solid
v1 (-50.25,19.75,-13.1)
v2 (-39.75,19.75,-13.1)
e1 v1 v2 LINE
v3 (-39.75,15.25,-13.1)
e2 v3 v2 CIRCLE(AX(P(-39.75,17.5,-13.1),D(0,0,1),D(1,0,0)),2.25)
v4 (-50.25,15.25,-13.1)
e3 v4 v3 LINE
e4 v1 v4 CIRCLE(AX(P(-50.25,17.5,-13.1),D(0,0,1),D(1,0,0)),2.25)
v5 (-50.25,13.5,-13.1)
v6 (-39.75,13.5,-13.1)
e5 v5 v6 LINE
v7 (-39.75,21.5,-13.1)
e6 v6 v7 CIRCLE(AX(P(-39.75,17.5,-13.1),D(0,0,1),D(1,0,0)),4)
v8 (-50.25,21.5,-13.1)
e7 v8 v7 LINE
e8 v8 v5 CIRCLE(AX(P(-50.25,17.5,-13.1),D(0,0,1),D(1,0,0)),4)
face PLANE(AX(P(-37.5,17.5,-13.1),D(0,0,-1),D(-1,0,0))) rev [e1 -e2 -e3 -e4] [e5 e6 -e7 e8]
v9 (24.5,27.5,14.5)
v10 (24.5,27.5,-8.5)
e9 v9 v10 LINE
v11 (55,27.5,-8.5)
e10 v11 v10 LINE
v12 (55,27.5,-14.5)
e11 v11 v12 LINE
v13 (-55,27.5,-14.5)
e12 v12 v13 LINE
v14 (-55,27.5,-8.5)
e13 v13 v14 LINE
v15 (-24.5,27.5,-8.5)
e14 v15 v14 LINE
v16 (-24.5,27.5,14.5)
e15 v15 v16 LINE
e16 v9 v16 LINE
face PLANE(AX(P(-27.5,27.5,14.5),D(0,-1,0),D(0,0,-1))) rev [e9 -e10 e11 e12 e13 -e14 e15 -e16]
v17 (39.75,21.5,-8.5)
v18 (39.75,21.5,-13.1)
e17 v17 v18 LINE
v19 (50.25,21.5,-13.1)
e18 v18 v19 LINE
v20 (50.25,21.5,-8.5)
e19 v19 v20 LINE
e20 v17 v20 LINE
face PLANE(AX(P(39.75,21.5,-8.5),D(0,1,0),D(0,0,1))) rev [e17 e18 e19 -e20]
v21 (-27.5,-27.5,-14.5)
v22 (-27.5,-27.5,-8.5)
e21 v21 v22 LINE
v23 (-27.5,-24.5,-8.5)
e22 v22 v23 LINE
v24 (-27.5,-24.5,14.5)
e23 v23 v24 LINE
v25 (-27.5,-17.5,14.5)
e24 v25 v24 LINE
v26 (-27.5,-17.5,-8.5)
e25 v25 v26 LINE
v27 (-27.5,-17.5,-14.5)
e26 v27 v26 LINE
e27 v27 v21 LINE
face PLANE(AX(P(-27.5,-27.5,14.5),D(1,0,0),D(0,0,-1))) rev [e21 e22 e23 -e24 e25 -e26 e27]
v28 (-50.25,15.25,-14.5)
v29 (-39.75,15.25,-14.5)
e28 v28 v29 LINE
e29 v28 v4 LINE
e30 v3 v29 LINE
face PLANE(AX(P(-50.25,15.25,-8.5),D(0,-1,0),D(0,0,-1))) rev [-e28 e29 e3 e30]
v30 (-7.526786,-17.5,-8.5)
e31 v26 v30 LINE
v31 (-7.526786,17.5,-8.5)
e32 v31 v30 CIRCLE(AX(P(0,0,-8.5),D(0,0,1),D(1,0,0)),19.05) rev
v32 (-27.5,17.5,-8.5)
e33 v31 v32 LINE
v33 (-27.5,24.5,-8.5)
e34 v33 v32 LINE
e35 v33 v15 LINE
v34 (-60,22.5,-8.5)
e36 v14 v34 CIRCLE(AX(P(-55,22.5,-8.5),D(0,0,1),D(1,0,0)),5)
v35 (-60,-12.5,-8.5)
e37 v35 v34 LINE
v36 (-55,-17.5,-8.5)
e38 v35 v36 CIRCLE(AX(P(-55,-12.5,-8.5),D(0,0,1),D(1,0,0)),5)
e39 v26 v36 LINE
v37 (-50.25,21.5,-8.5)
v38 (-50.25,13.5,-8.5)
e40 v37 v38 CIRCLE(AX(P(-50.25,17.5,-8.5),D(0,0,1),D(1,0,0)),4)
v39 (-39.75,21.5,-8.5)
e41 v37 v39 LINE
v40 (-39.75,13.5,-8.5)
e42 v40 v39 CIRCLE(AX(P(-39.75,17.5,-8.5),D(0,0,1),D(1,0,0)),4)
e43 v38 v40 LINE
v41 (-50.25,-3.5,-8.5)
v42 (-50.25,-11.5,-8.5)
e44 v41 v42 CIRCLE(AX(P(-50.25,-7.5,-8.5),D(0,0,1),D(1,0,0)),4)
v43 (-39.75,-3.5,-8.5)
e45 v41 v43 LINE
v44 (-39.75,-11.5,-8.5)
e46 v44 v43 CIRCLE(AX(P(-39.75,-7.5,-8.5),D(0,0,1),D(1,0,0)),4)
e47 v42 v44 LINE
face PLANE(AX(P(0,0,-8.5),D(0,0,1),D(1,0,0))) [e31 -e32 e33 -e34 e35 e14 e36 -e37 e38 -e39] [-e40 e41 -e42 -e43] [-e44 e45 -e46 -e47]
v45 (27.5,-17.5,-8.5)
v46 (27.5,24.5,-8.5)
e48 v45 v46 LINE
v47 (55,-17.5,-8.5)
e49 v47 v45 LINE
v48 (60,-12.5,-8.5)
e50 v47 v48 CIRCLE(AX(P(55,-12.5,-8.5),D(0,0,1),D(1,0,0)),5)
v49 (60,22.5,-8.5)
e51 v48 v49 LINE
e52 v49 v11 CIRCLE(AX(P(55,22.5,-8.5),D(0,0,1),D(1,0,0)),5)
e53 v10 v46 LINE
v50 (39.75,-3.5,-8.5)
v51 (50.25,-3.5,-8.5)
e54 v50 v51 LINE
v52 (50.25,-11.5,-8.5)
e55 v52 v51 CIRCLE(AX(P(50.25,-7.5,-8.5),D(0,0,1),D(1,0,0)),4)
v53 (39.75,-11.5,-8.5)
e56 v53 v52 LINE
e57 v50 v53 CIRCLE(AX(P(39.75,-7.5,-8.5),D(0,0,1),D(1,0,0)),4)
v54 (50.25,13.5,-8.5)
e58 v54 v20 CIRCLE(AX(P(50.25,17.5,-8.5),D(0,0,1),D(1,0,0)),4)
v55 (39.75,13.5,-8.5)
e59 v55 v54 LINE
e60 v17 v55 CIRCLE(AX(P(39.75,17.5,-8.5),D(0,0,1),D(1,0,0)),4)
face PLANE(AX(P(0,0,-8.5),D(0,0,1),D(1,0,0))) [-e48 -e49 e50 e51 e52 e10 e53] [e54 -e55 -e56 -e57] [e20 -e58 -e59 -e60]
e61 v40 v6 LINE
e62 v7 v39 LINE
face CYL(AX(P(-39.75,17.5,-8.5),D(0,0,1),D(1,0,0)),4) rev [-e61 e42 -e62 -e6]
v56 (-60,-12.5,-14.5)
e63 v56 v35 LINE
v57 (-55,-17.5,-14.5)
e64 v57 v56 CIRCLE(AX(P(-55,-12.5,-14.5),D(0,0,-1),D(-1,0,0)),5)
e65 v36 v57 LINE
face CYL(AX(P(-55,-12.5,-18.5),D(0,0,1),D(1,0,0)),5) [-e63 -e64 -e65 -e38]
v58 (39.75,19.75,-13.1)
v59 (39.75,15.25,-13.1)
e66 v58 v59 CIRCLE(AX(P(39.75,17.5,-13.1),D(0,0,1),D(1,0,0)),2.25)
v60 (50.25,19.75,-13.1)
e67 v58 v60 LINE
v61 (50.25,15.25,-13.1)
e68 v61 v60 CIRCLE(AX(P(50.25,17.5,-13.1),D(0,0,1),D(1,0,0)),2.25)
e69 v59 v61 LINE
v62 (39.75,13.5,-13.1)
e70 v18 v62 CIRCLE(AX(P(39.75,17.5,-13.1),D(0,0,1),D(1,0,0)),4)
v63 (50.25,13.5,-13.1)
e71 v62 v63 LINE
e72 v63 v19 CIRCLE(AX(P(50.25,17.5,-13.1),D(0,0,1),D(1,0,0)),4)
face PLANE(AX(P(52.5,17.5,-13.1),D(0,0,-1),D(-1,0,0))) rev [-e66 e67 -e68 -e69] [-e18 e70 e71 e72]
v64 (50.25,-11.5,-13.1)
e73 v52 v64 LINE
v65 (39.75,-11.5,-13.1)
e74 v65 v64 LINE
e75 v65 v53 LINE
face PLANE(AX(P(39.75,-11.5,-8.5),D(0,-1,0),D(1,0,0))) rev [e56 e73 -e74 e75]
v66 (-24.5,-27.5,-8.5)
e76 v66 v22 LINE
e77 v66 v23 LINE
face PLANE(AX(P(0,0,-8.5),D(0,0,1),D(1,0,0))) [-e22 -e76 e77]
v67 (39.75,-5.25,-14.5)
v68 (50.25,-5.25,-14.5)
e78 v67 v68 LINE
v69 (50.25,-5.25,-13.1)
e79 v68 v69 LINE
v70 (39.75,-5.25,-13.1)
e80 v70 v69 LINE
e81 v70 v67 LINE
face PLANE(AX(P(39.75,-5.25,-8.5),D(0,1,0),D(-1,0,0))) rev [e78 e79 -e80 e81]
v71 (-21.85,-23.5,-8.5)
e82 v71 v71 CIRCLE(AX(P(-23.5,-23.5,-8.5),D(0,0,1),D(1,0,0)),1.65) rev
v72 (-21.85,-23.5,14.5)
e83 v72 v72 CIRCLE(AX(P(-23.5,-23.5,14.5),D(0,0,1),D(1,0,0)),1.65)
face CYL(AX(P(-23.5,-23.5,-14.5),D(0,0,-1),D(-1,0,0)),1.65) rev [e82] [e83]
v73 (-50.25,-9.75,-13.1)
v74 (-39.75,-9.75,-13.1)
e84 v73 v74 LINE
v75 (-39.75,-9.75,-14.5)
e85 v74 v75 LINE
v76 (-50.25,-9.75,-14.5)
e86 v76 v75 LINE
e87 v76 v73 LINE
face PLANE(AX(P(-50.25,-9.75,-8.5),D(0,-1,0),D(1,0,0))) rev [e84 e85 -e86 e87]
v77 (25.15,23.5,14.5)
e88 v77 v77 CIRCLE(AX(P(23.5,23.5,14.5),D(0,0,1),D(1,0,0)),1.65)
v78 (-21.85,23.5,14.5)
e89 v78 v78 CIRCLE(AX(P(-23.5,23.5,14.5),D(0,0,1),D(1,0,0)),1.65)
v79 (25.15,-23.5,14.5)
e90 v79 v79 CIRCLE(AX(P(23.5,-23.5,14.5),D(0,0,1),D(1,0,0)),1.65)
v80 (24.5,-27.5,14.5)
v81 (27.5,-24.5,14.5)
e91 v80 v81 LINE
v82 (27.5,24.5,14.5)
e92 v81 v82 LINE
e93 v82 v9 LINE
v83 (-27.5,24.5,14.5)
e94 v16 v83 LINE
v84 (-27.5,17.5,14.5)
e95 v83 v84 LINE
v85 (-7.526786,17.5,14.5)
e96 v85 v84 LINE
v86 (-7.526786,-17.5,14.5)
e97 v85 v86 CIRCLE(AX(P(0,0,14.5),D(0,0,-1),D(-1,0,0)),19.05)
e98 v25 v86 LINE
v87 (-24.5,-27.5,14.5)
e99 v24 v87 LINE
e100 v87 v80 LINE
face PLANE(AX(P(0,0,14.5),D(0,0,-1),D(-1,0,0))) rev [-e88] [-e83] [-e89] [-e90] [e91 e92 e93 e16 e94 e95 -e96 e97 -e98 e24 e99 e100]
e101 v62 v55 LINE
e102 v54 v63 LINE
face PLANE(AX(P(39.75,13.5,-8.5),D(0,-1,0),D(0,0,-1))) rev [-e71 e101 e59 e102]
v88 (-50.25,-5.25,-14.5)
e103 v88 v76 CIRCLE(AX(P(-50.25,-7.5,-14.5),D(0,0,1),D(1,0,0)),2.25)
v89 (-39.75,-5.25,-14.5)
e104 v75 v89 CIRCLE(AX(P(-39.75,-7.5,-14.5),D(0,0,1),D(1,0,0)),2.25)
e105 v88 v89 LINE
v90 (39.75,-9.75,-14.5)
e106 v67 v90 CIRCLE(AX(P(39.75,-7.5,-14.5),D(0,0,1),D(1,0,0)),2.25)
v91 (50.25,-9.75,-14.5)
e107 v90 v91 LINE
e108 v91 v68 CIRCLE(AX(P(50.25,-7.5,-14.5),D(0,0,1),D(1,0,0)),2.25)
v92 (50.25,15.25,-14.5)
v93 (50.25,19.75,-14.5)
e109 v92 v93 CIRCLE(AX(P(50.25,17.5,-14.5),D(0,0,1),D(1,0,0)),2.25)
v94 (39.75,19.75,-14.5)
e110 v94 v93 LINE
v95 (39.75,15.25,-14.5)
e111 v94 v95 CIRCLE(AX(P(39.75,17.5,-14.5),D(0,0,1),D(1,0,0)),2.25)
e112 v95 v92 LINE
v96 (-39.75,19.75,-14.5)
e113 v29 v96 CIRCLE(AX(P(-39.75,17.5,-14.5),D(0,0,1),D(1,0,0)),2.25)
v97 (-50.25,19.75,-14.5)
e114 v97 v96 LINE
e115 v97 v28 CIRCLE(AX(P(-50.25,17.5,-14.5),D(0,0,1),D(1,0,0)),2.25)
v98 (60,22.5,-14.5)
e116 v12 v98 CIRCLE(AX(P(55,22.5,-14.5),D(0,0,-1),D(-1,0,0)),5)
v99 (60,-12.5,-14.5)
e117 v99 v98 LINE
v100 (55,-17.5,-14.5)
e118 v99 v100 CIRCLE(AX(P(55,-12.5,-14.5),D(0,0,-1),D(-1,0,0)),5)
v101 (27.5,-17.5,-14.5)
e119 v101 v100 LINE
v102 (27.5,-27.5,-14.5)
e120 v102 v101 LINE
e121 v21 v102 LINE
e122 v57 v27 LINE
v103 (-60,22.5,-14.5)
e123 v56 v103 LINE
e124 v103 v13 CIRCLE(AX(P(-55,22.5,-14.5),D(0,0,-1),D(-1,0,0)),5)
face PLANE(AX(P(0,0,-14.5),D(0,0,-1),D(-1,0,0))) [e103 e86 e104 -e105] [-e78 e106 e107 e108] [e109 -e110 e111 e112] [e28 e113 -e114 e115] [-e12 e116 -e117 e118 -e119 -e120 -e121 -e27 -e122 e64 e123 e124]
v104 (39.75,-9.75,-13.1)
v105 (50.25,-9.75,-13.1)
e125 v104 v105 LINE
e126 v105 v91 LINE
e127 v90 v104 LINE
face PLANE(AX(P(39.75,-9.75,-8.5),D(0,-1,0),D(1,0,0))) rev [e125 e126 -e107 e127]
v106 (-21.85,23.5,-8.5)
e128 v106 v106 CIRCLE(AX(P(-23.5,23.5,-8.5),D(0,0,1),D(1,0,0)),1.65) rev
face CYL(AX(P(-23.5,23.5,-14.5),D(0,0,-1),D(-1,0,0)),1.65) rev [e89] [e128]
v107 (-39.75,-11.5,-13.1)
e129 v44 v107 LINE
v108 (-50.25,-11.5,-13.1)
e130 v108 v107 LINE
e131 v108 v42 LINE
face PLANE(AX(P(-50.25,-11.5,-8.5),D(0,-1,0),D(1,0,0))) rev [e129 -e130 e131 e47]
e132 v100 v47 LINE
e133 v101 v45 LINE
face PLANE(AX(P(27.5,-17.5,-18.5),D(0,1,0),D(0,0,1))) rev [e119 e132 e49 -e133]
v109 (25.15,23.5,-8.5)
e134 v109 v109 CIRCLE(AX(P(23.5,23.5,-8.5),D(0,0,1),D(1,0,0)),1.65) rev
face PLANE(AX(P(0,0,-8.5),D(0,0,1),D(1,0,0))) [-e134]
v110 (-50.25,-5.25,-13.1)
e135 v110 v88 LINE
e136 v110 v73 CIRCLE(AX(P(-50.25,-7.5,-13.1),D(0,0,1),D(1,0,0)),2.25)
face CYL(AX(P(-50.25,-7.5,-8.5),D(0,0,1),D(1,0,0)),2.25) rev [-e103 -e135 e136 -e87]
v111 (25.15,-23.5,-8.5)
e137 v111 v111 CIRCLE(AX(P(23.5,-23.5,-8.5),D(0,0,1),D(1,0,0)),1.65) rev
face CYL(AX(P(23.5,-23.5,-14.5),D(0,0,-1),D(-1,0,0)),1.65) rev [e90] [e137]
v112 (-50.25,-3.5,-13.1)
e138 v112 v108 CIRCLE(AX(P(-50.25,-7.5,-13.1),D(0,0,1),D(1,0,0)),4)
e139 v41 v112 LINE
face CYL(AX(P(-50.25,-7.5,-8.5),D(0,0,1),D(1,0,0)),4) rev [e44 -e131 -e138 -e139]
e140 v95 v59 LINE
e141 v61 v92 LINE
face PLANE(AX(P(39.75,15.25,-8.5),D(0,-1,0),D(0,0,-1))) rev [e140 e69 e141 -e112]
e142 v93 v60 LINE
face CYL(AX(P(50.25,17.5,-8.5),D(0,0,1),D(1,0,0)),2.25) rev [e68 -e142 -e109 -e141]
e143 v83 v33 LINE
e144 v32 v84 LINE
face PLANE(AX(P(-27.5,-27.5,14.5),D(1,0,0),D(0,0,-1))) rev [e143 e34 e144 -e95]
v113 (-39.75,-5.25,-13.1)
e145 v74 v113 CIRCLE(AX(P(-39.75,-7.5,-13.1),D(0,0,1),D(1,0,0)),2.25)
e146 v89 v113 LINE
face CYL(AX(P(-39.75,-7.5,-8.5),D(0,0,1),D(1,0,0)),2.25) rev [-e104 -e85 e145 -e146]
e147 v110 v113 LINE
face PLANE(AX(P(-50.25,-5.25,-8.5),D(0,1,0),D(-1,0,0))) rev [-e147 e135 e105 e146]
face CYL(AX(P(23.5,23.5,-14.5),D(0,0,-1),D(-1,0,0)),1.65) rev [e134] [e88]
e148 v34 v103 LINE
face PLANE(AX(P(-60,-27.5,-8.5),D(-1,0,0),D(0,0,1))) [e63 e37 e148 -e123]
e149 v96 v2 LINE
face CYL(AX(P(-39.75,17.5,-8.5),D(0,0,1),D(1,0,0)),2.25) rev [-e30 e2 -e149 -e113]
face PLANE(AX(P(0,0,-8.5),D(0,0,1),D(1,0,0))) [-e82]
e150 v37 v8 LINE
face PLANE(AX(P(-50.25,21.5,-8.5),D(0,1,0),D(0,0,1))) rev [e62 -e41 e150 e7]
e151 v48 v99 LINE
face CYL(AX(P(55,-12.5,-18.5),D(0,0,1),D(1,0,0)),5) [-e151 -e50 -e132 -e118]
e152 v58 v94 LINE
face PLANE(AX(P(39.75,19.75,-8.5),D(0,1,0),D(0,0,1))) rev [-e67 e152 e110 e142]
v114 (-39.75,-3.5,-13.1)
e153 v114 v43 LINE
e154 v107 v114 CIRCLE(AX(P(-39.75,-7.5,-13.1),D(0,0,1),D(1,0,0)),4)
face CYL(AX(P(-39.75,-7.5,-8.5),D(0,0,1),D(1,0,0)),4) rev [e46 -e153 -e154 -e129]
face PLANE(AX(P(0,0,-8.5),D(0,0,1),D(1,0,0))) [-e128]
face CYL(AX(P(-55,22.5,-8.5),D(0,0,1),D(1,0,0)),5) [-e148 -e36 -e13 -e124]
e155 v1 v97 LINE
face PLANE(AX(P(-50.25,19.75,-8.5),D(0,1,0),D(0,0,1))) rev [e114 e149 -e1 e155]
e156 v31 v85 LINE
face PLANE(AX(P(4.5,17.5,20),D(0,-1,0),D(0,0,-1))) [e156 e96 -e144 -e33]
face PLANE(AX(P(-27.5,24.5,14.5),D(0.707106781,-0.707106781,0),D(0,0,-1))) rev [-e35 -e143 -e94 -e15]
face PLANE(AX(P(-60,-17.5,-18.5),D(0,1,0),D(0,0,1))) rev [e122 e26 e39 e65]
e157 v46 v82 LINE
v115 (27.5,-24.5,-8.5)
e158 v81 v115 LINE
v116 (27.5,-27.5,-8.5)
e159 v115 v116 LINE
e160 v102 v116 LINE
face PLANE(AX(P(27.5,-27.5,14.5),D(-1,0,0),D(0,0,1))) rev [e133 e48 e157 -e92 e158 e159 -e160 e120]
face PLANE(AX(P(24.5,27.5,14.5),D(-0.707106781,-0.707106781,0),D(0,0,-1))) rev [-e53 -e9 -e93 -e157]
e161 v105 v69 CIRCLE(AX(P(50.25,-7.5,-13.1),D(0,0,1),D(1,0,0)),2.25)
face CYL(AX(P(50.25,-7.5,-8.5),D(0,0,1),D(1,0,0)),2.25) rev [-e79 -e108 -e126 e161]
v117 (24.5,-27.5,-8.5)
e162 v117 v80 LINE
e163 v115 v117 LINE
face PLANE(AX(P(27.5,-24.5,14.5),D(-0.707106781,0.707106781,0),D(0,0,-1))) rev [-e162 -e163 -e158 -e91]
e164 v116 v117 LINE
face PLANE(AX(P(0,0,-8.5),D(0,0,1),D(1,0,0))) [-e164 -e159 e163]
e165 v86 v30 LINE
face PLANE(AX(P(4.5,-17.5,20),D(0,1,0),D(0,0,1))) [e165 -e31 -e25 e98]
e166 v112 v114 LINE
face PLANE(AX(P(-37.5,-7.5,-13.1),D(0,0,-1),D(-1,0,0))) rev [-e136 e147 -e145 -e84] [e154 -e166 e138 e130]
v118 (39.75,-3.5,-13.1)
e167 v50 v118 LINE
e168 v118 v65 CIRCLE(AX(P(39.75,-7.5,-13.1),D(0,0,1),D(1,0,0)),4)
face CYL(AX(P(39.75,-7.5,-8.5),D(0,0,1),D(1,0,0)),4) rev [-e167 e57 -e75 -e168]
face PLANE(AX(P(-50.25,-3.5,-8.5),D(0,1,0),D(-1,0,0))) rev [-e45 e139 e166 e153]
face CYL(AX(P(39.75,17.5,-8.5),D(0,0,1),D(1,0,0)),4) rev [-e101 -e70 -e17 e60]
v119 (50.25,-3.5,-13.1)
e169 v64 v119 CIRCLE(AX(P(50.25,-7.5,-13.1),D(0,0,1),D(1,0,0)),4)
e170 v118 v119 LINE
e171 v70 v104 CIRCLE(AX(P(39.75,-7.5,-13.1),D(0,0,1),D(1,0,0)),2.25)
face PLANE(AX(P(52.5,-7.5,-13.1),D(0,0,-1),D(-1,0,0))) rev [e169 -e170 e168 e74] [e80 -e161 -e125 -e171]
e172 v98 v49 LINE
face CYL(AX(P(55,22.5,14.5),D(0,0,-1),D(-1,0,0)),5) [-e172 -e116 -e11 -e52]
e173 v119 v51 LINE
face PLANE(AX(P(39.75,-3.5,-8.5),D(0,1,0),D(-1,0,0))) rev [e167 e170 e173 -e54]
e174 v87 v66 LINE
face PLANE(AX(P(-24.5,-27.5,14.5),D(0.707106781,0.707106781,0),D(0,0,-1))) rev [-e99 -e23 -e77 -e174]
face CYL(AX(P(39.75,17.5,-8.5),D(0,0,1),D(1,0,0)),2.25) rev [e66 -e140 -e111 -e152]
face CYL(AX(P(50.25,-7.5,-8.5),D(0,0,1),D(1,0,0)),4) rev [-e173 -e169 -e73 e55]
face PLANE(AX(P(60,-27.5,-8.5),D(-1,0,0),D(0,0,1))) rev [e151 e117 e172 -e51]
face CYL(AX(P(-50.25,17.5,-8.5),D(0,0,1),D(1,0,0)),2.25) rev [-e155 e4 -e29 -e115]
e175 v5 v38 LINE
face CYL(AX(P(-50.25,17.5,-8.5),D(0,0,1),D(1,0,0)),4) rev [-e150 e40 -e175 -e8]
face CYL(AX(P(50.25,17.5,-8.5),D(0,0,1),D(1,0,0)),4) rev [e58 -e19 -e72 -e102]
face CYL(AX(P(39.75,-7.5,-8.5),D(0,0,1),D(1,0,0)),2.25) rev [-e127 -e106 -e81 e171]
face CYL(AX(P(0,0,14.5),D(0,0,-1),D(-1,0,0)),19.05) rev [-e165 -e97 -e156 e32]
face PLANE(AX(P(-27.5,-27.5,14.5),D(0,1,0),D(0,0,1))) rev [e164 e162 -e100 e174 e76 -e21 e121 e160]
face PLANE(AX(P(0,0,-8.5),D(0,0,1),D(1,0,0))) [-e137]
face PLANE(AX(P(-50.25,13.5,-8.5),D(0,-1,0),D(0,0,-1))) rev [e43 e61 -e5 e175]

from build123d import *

# Parameters (mm, degrees)
SKETCH_1_W             = 55
SKETCH_1_H             = 55
EXTRUDE_1_DEPTH        = 14.5
SKETCH_2_R             = 19.05
CUT_EXTRUDE_1_DEPTH    = 49.512884886
SKETCH_3_W             = 40
SKETCH_3_H             = 35
CUT_EXTRUDE_2_DEPTH    = 32
CHAMFER_1_SIZE         = 3
HOLE_WIZARD_M4_1_D     = 3.3
HOLE_WIZARD_M4_1_DEPTH = 18.5
HOLE_WIZARD_M4_1_TIP   = 0.991420021
HOLE_WIZARD_M4_2_D     = 3.3
HOLE_WIZARD_M4_2_DEPTH = 18.5
HOLE_WIZARD_M4_2_TIP   = 0.991420021
SKETCH_13_W            = 120
SKETCH_13_H            = 55
EXTRUDE_2_DEPTH        = 6
SKETCH_14_W            = 32.5
SKETCH_14_H            = 10
CUT_EXTRUDE_3_DEPTH    = 10
HOLE_START             = -13.1
HOLE_WIZARD_1_DEPTH    = 4.6
HOLE_START_2           = -14.5
HOLE_WIZARD_1_2_DEPTH  = 1.4
FILLET_2_R             = 5


# Read off the part's stored shape, not the designer's step: 打孔尺寸(%根据)内六角圆柱头螺钉的类型1
with BuildPart() as part:
    # 草图1 → 凸台-拉伸1 (new, symmetric)
    with BuildSketch(Plane.XY):
        Rectangle(SKETCH_1_W, SKETCH_1_H)
    extrude(amount=EXTRUDE_1_DEPTH, both=True)

    # 草图2 → 切除-拉伸1 (cut, through all)
    with BuildSketch(Plane(origin=(0, 0, -14.5), x_dir=(-1, 0, 0), z_dir=(0, 0, -1))):
        Circle(SKETCH_2_R)
    extrude(amount=-CUT_EXTRUDE_1_DEPTH, mode=Mode.SUBTRACT)

    # 草图3 → 切除-拉伸2 (cut)
    with BuildSketch(Plane(origin=(-27.5, 0, 0), x_dir=(0, 0, -1), z_dir=(1, 0, 0))):
        Rectangle(SKETCH_3_W, SKETCH_3_H)
    extrude(amount=CUT_EXTRUDE_2_DEPTH, mode=Mode.SUBTRACT)

    # 倒角1
    chamfer_1_edges = [part.edges().sort_by_distance(p)[0] for p in [
        (27.5, -27.5, 0),
        (-27.5, -27.5, 0),
        (-27.5, 27.5, 0),
        (27.5, 27.5, 0),
    ]]
    chamfer(chamfer_1_edges, length=CHAMFER_1_SIZE)

    # M4 螺纹孔1
    with Locations(Plane(origin=(0, 0, -14.5), x_dir=(-1, 0, 0), z_dir=(0, 0, -1))):
        with Locations((-23.5, 23.5), (23.5, 23.5), (23.5, -23.5), (-23.5, -23.5)):
            Hole(HOLE_WIZARD_M4_1_D / 2, depth=HOLE_WIZARD_M4_1_DEPTH)
            with Locations((0, 0, -(HOLE_WIZARD_M4_1_DEPTH + HOLE_WIZARD_M4_1_TIP / 2))):  # 118° drill point
                Cone(0, HOLE_WIZARD_M4_1_D / 2, HOLE_WIZARD_M4_1_TIP, mode=Mode.SUBTRACT)

    # M4 螺纹孔2
    with Locations(Plane.XY.offset(14.5)):
        with Locations((23.5, 23.5), (-23.5, 23.5), (-23.5, -23.5), (23.5, -23.5)):
            Hole(HOLE_WIZARD_M4_2_D / 2, depth=HOLE_WIZARD_M4_2_DEPTH)
            with Locations((0, 0, -(HOLE_WIZARD_M4_2_DEPTH + HOLE_WIZARD_M4_2_TIP / 2))):  # 118° drill point
                Cone(0, HOLE_WIZARD_M4_2_D / 2, HOLE_WIZARD_M4_2_TIP, mode=Mode.SUBTRACT)

    # 草图13 → 凸台-拉伸2 (add)
    with BuildSketch(Plane(origin=(0, 0, -14.5), x_dir=(-1, 0, 0), z_dir=(0, 0, -1))):
        Rectangle(SKETCH_13_W, SKETCH_13_H)
    extrude(amount=-EXTRUDE_2_DEPTH)

    # 草图14 → 切除-拉伸3 (cut)
    with BuildSketch(Plane.XY.offset(-8.5)):
        with Locations((-43.75, -22.5)):
            Rectangle(SKETCH_14_W, SKETCH_14_H)
        with Locations((43.75, -22.5)):
            Rectangle(SKETCH_14_W, SKETCH_14_H)
    extrude(amount=-CUT_EXTRUDE_3_DEPTH, mode=Mode.SUBTRACT)

    # 打孔尺寸(%根据)内六角圆柱头螺钉的类型1 outline → 打孔尺寸(%根据)内六角圆柱头螺钉的类型1 (cut)
    with BuildSketch(Plane.XY.offset(HOLE_START)):
        with BuildLine():
            Line((39.75, -11.5), (50.25, -11.5))
            ThreePointArc((50.25, -11.5), (54.25, -7.5), (50.25, -3.5))
            Line((50.25, -3.5), (39.75, -3.5))
            ThreePointArc((39.75, -3.5), (35.75, -7.5), (39.75, -11.5))
        make_face()
        with BuildLine():
            ThreePointArc((-39.75, -11.5), (-35.75, -7.5), (-39.75, -3.5))
            Line((-39.75, -3.5), (-50.25, -3.5))
            ThreePointArc((-50.25, -3.5), (-54.25, -7.5), (-50.25, -11.5))
            Line((-50.25, -11.5), (-39.75, -11.5))
        make_face()
        with BuildLine():
            Line((39.75, 13.5), (50.25, 13.5))
            ThreePointArc((50.25, 13.5), (54.25, 17.5), (50.25, 21.5))
            Line((50.25, 21.5), (39.75, 21.5))
            ThreePointArc((39.75, 21.5), (35.75, 17.5), (39.75, 13.5))
        make_face()
        with BuildLine():
            ThreePointArc((-39.75, 13.5), (-35.75, 17.5), (-39.75, 21.5))
            Line((-39.75, 21.5), (-50.25, 21.5))
            ThreePointArc((-50.25, 21.5), (-54.25, 17.5), (-50.25, 13.5))
            Line((-50.25, 13.5), (-39.75, 13.5))
        make_face()
    extrude(amount=HOLE_WIZARD_1_DEPTH, mode=Mode.SUBTRACT)

    # Hole Wizard 1 2 outline → Hole Wizard 1 2 (cut)
    with BuildSketch(Plane.XY.offset(HOLE_START_2)):
        with BuildLine():
            Line((39.75, -9.75), (50.25, -9.75))
            ThreePointArc((50.25, -9.75), (52.5, -7.5), (50.25, -5.25))
            Line((50.25, -5.25), (39.75, -5.25))
            ThreePointArc((39.75, -5.25), (37.5, -7.5), (39.75, -9.75))
        make_face()
        with BuildLine():
            ThreePointArc((-39.75, -9.75), (-37.5, -7.5), (-39.75, -5.25))
            Line((-39.75, -5.25), (-50.25, -5.25))
            ThreePointArc((-50.25, -5.25), (-52.5, -7.5), (-50.25, -9.75))
            Line((-50.25, -9.75), (-39.75, -9.75))
        make_face()
        with BuildLine():
            Line((39.75, 15.25), (50.25, 15.25))
            ThreePointArc((50.25, 15.25), (52.5, 17.5), (50.25, 19.75))
            Line((50.25, 19.75), (39.75, 19.75))
            ThreePointArc((39.75, 19.75), (37.5, 17.5), (39.75, 15.25))
        make_face()
        with BuildLine():
            ThreePointArc((-39.75, 15.25), (-37.5, 17.5), (-39.75, 19.75))
            Line((-39.75, 19.75), (-50.25, 19.75))
            ThreePointArc((-50.25, 19.75), (-52.5, 17.5), (-50.25, 15.25))
            Line((-50.25, 15.25), (-39.75, 15.25))
        make_face()
    extrude(amount=HOLE_WIZARD_1_2_DEPTH, mode=Mode.SUBTRACT)

    # 圆角2
    fillet_2_edges = [part.edges().sort_by_distance(p)[0] for p in [
        (60, 27.5, -11.5),
        (-60, 27.5, -11.5),
        (-60, -17.5, -11.5),
        (60, -17.5, -11.5),
    ]]
    fillet(fillet_2_edges, radius=FILLET_2_R)


solid = part.part
